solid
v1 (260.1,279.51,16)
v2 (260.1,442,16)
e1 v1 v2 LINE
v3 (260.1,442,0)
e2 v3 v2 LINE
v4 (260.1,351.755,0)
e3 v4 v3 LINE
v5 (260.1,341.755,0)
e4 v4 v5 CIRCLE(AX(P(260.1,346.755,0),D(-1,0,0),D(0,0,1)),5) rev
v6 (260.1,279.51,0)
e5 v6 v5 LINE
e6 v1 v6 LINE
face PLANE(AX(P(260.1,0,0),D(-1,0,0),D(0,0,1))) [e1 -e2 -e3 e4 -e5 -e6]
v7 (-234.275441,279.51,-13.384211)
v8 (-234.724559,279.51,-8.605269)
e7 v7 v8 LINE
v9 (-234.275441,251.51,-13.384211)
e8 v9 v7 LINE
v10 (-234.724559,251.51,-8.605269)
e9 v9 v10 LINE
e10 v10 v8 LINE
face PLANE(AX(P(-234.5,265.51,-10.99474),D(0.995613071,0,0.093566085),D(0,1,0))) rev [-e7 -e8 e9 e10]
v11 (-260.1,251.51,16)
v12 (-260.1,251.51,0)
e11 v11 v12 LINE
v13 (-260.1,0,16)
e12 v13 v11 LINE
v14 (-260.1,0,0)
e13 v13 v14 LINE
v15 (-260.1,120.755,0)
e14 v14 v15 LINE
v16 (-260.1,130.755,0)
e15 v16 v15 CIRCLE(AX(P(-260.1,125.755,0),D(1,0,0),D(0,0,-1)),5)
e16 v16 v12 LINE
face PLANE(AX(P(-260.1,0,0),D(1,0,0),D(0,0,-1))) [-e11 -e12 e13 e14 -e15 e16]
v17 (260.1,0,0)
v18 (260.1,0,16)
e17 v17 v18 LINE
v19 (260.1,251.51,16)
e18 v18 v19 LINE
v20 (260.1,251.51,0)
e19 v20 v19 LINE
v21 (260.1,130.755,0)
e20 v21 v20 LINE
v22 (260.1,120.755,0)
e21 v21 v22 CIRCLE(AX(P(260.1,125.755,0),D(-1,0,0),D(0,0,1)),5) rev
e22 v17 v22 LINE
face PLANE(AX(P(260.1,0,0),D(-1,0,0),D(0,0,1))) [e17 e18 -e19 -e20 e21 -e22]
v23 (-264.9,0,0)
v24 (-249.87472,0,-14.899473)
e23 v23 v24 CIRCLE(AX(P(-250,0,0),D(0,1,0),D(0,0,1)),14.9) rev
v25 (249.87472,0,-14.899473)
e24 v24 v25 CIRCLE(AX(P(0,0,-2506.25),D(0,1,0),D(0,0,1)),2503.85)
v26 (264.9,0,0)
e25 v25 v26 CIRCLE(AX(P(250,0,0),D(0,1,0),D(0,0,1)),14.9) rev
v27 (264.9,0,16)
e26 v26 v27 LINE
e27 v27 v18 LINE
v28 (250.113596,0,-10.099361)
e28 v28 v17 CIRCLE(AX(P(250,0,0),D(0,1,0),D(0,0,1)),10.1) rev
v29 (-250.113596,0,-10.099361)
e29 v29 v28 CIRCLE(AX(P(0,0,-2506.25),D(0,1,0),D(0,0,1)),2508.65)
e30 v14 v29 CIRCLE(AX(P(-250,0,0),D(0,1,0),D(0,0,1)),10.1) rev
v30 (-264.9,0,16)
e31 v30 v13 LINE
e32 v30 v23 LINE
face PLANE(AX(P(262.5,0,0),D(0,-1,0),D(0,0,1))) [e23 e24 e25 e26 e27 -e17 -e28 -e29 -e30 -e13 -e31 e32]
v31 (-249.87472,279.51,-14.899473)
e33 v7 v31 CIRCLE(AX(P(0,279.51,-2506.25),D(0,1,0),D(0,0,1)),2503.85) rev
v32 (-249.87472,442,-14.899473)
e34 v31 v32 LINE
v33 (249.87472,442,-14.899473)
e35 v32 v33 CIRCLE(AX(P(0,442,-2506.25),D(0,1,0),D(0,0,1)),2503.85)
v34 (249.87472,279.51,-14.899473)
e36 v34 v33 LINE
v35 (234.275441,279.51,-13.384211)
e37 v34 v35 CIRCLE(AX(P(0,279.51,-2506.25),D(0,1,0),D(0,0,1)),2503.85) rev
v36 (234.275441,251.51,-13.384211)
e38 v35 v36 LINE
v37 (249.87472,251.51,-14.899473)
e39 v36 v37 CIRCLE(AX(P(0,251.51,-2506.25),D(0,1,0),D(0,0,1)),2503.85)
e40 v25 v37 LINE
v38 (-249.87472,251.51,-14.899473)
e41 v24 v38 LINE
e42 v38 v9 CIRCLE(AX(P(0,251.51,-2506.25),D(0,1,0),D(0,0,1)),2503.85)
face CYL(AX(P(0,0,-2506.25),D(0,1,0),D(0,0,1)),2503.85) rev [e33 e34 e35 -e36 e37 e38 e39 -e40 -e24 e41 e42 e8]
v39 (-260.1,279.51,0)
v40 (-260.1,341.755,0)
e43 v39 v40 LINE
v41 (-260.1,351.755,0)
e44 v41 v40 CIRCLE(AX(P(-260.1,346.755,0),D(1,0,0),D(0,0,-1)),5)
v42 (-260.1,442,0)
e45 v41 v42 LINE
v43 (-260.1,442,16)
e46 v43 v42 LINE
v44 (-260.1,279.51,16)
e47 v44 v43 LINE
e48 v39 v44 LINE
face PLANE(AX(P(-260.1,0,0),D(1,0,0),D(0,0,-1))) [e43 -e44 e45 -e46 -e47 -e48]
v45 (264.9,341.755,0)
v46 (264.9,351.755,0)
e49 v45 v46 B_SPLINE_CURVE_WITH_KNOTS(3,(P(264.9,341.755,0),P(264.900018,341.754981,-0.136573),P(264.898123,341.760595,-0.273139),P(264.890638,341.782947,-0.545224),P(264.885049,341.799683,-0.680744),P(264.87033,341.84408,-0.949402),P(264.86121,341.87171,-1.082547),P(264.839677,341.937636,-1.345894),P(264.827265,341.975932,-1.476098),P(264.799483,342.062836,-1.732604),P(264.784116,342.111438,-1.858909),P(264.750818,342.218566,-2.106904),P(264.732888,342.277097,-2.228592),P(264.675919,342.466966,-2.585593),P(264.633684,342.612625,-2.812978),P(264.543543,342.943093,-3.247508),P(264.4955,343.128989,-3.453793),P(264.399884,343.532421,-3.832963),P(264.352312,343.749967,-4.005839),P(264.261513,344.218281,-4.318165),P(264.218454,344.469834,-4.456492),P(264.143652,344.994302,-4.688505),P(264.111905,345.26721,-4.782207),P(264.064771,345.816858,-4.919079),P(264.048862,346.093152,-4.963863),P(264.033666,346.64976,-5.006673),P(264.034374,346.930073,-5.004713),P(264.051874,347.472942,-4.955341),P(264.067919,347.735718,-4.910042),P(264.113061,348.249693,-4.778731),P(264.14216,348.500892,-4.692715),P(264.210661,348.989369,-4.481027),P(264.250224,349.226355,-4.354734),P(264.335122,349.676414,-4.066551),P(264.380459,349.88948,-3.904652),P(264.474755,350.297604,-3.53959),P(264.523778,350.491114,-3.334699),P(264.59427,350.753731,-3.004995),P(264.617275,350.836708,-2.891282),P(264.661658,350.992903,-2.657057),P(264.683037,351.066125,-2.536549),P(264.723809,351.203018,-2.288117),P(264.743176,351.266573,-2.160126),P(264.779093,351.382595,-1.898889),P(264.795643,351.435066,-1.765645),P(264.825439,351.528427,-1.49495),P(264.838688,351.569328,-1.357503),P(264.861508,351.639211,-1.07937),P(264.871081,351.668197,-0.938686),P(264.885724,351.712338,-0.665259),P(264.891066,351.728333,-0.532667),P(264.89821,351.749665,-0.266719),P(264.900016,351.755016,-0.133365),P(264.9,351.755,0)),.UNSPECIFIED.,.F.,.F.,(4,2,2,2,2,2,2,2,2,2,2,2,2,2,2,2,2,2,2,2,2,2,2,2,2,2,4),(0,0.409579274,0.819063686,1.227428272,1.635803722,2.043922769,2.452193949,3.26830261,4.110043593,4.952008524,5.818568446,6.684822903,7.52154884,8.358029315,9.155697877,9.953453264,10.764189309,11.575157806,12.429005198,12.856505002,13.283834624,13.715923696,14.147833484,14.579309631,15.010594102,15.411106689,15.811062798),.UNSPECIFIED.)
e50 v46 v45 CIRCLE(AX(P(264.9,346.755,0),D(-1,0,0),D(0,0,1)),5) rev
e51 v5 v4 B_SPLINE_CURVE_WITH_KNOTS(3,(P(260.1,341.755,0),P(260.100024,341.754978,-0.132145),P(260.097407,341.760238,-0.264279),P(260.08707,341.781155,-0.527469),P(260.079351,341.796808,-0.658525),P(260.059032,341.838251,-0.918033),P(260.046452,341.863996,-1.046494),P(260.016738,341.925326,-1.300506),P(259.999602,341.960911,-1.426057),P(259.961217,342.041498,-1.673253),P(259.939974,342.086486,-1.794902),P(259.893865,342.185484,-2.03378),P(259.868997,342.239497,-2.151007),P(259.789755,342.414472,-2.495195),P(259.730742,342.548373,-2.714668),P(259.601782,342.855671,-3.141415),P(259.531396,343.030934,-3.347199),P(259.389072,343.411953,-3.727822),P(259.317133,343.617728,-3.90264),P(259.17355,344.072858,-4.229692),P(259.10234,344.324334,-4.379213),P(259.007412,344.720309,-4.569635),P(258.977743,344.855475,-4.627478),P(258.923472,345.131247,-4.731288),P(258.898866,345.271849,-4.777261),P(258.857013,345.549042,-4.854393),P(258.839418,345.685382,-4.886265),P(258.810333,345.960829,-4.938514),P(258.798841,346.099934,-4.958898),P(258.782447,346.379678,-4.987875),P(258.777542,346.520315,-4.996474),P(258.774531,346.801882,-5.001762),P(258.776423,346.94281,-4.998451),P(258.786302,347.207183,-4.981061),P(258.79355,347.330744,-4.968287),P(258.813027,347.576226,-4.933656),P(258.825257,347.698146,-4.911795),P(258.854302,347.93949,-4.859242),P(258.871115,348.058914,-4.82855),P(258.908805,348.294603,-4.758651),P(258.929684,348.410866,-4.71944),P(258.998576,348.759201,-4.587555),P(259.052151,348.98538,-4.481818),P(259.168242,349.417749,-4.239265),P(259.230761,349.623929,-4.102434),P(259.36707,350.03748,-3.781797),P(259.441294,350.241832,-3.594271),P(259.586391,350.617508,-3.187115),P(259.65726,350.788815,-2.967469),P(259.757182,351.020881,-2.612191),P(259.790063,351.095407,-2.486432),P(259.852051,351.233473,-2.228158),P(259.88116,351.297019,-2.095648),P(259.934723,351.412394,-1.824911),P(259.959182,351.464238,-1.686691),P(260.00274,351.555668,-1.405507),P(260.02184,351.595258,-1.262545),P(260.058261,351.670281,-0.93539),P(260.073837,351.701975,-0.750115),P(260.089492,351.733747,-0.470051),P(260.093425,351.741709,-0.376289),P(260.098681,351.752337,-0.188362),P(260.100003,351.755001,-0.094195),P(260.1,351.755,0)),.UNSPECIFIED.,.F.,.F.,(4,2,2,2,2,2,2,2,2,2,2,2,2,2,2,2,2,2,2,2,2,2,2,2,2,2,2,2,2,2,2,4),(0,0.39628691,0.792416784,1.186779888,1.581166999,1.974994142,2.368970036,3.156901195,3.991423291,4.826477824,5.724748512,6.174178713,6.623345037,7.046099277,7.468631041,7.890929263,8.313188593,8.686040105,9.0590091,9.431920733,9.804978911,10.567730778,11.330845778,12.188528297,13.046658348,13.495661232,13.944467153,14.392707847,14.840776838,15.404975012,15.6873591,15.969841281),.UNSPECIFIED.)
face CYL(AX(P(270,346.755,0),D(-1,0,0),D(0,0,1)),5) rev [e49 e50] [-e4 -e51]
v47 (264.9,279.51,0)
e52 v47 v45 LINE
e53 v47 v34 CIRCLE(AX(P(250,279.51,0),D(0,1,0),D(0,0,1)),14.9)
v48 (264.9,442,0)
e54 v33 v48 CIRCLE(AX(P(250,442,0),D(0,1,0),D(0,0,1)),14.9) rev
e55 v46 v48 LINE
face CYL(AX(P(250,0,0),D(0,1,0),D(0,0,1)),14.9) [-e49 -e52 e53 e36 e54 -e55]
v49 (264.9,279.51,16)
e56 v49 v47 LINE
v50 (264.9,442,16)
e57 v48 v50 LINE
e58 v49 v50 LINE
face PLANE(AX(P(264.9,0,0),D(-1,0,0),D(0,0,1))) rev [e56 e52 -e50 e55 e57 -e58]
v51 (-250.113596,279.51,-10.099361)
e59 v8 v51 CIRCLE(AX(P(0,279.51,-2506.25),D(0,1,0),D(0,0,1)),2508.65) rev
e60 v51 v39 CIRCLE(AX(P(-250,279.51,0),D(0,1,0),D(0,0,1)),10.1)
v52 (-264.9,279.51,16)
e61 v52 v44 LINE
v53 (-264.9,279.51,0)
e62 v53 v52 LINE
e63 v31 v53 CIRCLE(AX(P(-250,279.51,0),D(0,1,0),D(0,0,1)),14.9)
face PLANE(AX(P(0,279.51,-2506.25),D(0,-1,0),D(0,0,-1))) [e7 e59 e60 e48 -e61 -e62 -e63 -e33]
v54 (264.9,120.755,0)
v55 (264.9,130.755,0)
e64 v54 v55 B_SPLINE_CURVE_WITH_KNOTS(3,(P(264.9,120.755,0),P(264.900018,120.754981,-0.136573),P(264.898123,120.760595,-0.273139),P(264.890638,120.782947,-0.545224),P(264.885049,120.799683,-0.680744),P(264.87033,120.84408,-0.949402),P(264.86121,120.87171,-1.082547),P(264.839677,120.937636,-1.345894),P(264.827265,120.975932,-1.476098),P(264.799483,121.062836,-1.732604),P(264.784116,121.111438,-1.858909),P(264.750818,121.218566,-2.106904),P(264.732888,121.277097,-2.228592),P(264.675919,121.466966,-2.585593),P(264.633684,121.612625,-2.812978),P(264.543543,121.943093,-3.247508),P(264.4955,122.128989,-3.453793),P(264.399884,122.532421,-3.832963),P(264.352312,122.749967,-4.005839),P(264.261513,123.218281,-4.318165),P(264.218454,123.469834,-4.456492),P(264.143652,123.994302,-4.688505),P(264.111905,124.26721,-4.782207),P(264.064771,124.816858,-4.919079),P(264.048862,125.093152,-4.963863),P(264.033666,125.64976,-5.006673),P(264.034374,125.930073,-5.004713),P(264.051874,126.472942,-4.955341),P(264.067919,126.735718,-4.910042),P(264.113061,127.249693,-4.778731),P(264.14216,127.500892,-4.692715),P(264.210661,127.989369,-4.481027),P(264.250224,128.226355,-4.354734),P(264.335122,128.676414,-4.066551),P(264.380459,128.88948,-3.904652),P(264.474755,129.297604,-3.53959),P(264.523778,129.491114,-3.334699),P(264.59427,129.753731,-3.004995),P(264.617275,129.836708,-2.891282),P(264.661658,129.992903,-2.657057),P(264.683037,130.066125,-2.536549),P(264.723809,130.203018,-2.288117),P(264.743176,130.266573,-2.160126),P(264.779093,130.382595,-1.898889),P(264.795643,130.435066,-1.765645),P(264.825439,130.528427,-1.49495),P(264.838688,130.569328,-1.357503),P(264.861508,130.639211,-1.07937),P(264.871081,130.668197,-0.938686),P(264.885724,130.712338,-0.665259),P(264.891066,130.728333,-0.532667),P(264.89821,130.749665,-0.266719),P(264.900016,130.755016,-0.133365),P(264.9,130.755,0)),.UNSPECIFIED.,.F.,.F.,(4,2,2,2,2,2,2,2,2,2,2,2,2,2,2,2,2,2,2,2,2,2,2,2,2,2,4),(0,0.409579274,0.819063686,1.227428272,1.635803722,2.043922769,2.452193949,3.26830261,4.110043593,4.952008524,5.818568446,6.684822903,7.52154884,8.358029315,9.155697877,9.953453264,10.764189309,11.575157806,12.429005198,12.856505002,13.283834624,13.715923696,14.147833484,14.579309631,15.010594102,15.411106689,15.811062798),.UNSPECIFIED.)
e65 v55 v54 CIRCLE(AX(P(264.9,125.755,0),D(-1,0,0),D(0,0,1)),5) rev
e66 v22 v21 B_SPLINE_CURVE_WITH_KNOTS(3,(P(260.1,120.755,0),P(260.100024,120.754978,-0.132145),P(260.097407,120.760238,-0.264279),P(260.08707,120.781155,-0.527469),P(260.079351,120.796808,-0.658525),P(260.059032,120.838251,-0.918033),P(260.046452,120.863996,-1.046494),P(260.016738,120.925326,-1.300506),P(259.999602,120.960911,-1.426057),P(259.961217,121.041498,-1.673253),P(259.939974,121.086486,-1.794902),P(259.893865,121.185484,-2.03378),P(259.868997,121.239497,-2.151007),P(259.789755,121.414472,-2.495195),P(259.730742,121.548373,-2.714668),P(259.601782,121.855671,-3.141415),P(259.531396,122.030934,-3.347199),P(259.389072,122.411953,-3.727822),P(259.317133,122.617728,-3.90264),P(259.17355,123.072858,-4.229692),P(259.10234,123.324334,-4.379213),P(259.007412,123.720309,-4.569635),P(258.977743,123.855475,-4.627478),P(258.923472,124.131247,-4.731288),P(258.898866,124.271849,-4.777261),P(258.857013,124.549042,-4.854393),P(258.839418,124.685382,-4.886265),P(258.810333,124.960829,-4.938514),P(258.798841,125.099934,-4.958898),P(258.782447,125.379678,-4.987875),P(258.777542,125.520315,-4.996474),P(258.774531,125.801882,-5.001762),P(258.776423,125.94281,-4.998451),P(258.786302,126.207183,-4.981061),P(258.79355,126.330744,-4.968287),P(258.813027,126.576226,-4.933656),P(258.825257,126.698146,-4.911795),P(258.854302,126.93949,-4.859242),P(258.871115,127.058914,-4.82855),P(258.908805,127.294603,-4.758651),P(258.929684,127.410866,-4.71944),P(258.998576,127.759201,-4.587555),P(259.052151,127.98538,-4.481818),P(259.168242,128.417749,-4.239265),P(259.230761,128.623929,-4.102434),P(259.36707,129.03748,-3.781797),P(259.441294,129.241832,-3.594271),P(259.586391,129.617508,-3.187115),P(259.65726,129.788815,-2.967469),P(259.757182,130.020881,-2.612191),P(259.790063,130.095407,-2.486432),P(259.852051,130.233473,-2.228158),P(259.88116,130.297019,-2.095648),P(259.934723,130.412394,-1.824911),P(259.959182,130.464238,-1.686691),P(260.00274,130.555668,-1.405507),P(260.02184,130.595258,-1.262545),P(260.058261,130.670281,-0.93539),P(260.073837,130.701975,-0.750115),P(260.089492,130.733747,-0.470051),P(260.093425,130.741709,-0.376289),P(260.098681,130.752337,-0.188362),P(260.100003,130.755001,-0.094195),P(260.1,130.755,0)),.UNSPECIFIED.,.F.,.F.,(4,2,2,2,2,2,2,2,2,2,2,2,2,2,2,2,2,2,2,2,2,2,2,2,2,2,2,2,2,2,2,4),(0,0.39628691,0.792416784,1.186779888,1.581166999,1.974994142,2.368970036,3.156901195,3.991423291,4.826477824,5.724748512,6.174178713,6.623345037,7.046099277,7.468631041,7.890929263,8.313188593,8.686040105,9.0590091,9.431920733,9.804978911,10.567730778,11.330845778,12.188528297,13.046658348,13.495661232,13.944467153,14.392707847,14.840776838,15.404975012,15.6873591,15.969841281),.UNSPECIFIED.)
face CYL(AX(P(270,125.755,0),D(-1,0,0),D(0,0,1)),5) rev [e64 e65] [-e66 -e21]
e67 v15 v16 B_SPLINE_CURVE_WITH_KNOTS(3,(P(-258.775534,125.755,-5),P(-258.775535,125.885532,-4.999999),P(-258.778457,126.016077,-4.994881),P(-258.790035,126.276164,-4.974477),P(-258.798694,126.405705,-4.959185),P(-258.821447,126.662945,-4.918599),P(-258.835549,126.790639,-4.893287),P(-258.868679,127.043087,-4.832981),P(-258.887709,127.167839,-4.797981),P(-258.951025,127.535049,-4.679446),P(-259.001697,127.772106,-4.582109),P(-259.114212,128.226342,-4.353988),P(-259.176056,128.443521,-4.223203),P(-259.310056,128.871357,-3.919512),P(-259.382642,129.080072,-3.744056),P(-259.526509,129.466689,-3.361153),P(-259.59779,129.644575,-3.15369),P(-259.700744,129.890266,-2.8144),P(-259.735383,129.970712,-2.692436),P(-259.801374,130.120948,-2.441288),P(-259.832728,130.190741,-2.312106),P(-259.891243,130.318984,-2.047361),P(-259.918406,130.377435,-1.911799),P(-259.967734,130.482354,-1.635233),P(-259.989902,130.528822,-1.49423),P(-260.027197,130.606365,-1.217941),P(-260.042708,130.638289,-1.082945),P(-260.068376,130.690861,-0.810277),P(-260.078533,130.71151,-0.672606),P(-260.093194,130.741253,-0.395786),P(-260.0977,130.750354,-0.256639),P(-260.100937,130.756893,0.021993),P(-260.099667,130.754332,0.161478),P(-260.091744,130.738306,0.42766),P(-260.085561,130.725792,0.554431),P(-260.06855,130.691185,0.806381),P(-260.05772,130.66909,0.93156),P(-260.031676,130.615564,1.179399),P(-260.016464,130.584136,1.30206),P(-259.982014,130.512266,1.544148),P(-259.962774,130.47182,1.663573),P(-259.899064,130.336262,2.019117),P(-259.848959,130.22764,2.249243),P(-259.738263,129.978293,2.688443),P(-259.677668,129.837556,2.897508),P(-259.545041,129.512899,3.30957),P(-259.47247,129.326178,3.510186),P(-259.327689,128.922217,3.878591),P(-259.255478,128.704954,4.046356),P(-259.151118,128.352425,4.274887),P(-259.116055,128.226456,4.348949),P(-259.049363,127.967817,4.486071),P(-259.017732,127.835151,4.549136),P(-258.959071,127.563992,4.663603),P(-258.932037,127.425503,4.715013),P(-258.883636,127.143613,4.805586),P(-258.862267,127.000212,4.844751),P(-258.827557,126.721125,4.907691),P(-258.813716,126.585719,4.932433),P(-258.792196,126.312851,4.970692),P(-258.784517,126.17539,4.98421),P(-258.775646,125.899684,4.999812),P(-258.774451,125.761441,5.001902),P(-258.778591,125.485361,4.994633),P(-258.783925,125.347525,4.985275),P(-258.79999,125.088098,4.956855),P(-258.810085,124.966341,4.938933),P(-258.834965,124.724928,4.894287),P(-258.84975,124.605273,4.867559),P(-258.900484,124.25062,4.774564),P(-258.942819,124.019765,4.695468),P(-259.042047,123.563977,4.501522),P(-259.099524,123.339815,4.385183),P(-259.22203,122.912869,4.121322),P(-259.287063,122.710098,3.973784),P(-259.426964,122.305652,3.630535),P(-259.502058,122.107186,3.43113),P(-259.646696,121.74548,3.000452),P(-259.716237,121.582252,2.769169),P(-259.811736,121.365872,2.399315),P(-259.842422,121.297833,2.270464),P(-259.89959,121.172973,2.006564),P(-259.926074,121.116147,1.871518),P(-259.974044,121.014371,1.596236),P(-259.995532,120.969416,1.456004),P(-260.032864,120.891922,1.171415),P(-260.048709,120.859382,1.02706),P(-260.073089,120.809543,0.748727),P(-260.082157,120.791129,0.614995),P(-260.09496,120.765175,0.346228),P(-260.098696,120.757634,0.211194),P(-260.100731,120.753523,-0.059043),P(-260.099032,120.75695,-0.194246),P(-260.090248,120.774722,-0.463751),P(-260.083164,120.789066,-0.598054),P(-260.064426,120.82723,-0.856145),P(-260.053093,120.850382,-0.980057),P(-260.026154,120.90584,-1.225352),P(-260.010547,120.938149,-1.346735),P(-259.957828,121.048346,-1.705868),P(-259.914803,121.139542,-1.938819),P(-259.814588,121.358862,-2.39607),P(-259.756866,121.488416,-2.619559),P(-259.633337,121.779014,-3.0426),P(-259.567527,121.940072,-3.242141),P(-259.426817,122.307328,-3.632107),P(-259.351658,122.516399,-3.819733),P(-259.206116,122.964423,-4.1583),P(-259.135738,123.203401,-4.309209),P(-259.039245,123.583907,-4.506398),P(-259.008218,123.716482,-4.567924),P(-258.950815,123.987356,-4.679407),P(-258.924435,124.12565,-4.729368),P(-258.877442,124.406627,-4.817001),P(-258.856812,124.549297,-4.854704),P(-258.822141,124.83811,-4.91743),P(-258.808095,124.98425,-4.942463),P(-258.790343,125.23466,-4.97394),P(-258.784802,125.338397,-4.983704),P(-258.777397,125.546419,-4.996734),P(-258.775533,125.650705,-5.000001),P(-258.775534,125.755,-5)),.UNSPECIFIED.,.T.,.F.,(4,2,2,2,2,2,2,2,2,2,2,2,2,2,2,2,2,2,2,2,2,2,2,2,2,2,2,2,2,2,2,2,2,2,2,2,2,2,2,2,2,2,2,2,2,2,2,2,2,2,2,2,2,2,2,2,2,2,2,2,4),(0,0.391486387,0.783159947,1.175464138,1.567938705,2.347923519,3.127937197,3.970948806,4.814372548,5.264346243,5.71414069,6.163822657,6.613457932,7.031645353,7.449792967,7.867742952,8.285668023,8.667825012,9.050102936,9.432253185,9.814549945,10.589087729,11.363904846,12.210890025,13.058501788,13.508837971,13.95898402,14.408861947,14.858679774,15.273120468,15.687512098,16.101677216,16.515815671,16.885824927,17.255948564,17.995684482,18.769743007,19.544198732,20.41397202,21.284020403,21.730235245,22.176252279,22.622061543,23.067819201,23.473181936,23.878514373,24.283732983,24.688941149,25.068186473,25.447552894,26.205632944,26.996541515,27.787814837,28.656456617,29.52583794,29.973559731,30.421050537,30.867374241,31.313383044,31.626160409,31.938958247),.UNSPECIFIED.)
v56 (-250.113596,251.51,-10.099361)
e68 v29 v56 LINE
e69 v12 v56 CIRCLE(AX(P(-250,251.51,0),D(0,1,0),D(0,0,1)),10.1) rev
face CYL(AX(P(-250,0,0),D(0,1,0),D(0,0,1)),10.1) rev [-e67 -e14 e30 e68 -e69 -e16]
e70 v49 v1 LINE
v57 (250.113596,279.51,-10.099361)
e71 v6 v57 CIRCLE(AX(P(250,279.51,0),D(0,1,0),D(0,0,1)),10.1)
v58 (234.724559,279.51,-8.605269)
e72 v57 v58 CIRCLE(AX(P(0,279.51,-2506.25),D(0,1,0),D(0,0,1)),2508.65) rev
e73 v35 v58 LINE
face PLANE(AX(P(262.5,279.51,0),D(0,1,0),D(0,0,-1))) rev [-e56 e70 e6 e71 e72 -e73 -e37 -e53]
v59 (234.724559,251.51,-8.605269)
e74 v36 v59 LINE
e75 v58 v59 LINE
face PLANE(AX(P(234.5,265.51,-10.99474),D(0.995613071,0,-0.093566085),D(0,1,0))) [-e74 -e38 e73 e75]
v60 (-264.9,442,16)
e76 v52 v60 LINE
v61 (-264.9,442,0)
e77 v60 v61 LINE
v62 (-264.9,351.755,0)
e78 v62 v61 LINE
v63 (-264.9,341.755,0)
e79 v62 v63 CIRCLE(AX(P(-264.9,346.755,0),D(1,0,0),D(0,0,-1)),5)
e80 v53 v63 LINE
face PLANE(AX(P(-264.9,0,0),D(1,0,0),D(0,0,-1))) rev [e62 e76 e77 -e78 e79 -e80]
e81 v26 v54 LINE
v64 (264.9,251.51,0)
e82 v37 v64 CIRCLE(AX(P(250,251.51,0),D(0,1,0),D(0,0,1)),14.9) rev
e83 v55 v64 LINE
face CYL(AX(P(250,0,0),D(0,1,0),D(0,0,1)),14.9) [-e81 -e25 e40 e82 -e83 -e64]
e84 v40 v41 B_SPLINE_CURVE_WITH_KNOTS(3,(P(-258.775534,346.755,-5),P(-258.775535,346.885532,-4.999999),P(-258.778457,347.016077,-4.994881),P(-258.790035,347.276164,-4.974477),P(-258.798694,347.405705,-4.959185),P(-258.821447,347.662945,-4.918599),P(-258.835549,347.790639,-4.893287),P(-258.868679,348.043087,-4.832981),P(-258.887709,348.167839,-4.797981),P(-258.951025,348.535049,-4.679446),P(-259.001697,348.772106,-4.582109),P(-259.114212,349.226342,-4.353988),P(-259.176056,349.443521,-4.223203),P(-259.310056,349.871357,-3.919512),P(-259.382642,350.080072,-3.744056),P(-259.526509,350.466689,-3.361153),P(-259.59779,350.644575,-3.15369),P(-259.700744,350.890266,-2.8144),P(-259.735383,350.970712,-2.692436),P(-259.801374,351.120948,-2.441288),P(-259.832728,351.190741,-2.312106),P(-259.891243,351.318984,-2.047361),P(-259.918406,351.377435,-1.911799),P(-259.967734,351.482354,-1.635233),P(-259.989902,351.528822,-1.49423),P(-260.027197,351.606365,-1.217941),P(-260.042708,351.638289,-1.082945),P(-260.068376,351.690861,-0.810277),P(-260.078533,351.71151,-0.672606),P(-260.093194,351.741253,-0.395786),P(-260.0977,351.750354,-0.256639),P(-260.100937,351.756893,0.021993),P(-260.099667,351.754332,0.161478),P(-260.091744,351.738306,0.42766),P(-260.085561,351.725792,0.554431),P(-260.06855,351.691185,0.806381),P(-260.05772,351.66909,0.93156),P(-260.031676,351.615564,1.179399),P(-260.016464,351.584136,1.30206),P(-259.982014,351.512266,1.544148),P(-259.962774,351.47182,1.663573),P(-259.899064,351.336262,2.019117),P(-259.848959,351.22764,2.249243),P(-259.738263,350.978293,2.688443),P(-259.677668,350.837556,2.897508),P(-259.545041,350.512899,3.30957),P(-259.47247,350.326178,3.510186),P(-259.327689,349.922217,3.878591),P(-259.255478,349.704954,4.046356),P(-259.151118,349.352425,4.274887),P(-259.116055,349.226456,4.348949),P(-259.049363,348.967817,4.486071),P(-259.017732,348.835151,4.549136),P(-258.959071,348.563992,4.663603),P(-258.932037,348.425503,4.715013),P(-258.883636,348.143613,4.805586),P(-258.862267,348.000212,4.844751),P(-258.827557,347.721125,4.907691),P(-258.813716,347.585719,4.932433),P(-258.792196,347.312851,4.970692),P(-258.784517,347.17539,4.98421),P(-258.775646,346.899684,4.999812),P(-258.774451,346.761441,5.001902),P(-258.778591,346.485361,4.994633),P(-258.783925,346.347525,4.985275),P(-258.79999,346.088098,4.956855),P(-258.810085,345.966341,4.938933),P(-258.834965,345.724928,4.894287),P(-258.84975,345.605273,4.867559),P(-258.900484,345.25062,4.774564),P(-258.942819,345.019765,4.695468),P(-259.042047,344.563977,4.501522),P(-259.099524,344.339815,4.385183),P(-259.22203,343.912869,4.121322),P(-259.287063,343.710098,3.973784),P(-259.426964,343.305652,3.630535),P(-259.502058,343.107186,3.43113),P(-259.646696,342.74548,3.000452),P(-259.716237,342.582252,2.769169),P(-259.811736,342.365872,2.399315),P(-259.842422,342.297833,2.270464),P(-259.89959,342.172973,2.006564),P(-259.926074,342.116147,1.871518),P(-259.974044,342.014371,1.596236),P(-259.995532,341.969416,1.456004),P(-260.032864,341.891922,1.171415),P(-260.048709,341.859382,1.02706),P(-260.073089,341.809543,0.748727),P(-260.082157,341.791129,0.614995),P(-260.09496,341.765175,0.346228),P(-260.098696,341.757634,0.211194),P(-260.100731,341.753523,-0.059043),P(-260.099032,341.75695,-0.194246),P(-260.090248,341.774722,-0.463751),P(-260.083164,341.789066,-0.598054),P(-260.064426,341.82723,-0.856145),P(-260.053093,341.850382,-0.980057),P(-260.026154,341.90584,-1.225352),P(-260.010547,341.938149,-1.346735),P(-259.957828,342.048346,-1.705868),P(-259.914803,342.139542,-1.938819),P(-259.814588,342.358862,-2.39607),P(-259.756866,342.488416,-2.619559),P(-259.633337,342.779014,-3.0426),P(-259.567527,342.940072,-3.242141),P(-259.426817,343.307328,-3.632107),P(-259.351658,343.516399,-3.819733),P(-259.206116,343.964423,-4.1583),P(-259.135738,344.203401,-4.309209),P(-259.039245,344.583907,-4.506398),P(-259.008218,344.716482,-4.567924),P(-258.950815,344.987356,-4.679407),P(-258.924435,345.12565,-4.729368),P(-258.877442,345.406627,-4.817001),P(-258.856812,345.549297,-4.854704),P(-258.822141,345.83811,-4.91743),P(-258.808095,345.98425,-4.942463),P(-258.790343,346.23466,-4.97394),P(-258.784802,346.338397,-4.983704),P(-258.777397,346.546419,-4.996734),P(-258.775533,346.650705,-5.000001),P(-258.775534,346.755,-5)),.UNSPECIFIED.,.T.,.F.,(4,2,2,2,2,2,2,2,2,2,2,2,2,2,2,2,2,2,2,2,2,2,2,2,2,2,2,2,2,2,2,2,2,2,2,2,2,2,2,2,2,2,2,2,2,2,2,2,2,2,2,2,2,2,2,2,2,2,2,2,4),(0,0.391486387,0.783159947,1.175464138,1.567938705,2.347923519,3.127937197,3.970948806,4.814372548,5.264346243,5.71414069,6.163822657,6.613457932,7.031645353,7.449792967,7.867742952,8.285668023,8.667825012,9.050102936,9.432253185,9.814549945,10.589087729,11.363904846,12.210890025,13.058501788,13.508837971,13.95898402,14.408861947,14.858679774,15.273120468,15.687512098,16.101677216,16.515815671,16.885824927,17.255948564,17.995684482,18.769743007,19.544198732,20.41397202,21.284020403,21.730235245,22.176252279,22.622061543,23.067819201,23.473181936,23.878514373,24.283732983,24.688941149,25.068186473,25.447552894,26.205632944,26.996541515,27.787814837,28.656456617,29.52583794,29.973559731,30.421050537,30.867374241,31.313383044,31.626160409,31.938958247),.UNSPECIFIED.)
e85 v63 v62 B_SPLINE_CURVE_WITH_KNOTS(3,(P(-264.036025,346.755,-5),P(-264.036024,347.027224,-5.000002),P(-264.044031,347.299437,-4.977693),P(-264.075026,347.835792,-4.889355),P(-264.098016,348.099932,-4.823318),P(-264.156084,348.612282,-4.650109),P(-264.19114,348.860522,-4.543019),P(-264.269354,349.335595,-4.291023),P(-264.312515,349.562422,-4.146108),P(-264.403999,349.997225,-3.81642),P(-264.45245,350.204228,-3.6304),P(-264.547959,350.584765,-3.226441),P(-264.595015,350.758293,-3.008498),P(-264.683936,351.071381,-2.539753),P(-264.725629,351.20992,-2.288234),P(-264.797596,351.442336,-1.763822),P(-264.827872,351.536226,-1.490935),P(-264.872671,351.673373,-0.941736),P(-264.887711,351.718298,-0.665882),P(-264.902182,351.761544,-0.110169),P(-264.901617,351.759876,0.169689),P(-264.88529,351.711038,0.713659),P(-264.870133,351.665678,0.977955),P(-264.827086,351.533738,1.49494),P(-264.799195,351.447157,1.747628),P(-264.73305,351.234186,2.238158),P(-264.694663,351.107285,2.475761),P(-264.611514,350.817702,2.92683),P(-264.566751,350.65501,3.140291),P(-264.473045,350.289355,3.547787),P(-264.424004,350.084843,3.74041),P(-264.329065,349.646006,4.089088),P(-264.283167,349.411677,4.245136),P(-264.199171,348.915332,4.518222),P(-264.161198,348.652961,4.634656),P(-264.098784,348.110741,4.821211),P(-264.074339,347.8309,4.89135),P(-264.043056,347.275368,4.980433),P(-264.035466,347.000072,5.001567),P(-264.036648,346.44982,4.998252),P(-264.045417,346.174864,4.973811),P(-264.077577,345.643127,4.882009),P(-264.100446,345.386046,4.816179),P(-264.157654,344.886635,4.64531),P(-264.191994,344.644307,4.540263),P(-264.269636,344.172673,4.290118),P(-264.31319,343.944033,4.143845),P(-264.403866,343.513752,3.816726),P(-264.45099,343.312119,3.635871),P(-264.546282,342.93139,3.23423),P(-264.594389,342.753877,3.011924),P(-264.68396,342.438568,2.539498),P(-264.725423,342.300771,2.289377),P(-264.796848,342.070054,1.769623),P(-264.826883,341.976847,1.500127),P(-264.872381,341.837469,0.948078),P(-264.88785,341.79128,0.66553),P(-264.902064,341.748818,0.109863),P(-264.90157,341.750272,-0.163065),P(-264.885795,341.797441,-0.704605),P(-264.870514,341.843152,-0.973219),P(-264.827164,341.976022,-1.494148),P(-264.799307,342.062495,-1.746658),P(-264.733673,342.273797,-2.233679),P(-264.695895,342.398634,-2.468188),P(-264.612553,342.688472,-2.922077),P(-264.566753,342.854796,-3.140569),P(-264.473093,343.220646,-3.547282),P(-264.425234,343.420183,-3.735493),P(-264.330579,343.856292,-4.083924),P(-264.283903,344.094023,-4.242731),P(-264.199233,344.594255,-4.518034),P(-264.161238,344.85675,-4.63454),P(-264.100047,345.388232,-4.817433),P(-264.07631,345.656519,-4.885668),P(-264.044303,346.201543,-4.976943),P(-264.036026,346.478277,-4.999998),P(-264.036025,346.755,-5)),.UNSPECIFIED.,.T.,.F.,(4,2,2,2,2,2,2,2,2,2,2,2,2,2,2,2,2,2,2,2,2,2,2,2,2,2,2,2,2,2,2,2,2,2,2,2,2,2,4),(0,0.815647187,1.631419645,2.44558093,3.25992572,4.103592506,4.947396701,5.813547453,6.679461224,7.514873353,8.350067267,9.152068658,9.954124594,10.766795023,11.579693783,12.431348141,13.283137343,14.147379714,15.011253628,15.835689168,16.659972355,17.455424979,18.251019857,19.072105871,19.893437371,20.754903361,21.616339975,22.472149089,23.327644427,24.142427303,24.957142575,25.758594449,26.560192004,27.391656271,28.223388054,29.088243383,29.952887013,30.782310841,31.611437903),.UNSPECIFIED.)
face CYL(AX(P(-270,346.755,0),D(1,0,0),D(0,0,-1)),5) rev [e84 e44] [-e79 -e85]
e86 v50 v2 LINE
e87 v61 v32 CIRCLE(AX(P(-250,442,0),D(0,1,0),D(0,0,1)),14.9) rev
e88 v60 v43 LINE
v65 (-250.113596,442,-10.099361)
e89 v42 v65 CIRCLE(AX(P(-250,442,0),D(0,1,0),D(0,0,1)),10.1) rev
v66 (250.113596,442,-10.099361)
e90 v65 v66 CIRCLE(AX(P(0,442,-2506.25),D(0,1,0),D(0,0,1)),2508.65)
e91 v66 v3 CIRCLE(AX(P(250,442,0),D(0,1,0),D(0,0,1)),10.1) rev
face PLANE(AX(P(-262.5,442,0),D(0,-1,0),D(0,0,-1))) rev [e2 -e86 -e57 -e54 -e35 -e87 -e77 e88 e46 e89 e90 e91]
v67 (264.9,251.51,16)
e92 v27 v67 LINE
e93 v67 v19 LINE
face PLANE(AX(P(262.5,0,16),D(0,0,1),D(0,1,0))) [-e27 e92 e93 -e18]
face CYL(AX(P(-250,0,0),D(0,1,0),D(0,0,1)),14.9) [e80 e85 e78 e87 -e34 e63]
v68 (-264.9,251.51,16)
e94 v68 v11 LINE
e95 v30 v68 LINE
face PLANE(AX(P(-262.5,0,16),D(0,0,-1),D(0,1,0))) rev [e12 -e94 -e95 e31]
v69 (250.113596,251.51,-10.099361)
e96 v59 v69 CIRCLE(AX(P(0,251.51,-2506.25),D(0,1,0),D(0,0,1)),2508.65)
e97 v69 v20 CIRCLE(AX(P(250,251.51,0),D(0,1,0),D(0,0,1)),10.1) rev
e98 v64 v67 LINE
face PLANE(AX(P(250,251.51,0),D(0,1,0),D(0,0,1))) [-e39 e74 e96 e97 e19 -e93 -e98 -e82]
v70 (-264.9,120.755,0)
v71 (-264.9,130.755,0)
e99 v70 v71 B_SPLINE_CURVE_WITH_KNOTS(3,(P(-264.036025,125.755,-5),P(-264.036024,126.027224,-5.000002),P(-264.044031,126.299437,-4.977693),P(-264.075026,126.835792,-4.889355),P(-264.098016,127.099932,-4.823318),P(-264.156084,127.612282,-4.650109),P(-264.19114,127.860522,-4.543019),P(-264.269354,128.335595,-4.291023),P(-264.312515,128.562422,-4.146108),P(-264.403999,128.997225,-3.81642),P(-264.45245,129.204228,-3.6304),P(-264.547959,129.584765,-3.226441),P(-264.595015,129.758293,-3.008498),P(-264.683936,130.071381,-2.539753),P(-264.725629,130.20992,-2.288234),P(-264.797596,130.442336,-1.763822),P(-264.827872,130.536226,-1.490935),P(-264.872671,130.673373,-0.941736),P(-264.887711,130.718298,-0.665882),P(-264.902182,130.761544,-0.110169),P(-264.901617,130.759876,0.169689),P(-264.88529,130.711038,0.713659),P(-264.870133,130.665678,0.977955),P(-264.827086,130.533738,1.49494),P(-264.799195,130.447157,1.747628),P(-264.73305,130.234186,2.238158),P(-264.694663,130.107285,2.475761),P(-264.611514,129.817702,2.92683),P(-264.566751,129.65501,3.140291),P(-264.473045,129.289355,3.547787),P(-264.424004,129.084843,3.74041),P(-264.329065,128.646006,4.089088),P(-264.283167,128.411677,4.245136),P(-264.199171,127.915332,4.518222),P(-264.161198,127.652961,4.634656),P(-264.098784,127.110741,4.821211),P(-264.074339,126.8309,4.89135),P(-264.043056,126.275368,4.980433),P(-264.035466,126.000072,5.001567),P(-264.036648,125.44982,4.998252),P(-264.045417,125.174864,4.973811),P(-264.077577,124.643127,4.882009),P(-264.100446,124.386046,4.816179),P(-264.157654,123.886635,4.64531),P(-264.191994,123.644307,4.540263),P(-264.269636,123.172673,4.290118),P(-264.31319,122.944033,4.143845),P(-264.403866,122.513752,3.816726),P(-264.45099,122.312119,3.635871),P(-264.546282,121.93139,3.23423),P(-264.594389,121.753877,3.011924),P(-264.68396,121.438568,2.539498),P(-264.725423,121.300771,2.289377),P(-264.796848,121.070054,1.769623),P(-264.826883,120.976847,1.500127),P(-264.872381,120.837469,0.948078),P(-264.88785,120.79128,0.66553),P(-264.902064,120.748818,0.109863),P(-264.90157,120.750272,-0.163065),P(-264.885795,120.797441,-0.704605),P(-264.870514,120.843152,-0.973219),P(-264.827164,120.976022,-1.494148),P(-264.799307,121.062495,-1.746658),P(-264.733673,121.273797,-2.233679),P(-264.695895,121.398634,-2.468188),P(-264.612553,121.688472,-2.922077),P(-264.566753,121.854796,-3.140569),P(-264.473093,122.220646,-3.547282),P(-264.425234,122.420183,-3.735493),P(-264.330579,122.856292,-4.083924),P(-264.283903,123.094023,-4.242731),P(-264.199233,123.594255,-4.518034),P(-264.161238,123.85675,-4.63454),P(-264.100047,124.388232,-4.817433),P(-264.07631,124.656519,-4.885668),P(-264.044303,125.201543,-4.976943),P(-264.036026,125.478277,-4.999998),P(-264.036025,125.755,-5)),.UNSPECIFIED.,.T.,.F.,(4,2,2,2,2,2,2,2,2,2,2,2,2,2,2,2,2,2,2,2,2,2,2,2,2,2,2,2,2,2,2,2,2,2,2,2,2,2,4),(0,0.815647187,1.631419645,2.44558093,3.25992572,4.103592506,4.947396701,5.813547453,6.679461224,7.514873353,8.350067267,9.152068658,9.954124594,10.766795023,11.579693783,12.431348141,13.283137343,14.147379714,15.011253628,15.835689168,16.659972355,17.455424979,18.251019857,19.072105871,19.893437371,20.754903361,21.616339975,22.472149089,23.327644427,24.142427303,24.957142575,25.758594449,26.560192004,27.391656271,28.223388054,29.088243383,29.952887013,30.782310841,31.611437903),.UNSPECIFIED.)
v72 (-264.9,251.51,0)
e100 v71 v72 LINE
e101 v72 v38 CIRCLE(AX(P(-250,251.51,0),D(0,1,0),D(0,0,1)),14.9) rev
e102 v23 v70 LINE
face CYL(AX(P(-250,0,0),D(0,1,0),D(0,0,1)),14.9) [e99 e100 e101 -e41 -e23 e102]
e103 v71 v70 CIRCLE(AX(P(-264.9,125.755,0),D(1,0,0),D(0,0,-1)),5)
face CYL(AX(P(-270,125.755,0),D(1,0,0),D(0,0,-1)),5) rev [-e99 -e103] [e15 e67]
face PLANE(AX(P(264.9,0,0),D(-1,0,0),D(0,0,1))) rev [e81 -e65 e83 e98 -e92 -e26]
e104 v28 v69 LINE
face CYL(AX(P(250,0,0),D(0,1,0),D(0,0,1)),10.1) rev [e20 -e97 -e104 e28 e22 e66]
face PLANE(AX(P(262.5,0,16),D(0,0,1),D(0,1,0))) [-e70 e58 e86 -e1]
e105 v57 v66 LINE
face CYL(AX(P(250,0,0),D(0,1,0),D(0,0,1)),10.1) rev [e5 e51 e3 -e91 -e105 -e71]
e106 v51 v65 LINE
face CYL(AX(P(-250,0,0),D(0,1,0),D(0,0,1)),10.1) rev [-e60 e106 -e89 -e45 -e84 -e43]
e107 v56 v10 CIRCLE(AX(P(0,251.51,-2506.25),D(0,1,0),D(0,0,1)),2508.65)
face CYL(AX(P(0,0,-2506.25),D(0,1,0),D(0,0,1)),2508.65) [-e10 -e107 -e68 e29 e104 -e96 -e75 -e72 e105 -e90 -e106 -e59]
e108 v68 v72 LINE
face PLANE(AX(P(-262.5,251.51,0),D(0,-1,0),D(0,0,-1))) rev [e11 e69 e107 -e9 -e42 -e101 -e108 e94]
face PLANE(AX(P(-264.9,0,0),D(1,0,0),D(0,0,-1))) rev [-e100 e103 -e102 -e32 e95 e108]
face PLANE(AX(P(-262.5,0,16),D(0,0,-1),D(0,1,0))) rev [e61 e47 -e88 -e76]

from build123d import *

# Parameters (mm, degrees)
THICKEN1_DEPTH     = 442
THICKEN1_2_DEPTH   = 251.51
THICKEN1_START     = 279.51
THICKEN1_3_DEPTH   = 162.49
SKETCH4_R          = 5
CUT_EXTRUDE1_DEPTH = 20
SKETCH5_R          = 5
CUT_EXTRUDE2_DEPTH = 20
CUT_EXTRUDE3_START = -20
SKETCH7_R          = 5
CUT_EXTRUDE3_DEPTH = 20


# Read off the part's stored shape, not the designer's step: Thicken1
with BuildPart() as part:
    # Thicken1 outline → Thicken1 (new body)
    with BuildSketch(Plane(origin=(0, 0, 0), x_dir=(1, 0, 0), z_dir=(0, 1, 0))):
        with BuildLine():
            ThreePointArc((-234.724558603, 8.605268641), (0, -2.4), (234.724558603, 8.605268641))
            Line((234.724558603, 8.605268641), (234.275441397, 13.384211383))
            ThreePointArc((234.275441397, 13.384211383), (0, 2.4), (-234.275441397, 13.384211383))
            Line((-234.275441397, 13.384211383), (-234.724558603, 8.605268641))
        make_face()
    extrude(amount=THICKEN1_DEPTH)

    # Thicken1 2 outline → Thicken1 2 (add)
    with BuildSketch(Plane(origin=(0, 0, 0), x_dir=(1, 0, 0), z_dir=(0, 1, 0))):
        with BuildLine():
            Line((234.275441397, 13.384211383), (234.724558603, 8.605268641))
            ThreePointArc((234.724558603, 8.605268641), (242.420228217, 9.340459098), (250.113595715, 10.099361169))
            ThreePointArc((250.113595715, 10.099361169), (257.181828344, 7.101502773), (260.1, 0))
            Line((260.1, 0), (260.1, -16))
            Line((260.1, -16), (264.9, -16))
            Line((264.9, -16), (264.9, 0))
            ThreePointArc((264.9, 0), (260.491504347, 10.580091518), (249.874719929, 14.89947331))
            ThreePointArc((249.874719929, 14.89947331), (242.076266252, 14.129636973), (234.275441397, 13.384211383))
        make_face()
        with BuildLine():
            ThreePointArc((-250.113595715, 10.099361169), (-242.420228217, 9.340459098), (-234.724558603, 8.605268641))
            Line((-234.724558603, 8.605268641), (-234.275441397, 13.384211383))
            ThreePointArc((-234.275441397, 13.384211383), (-242.076266252, 14.129636973), (-249.874719929, 14.89947331))
            ThreePointArc((-249.874719929, 14.89947331), (-260.491504347, 10.580091518), (-264.9, 0))
            Line((-264.9, 0), (-264.9, -16))
            Line((-264.9, -16), (-260.1, -16))
            Line((-260.1, -16), (-260.1, 0))
            ThreePointArc((-260.1, 0), (-257.181828344, 7.101502773), (-250.113595715, 10.099361169))
        make_face()
    extrude(amount=THICKEN1_2_DEPTH)

    # Thicken1 3 outline → Thicken1 3 (add)
    with BuildSketch(Plane(origin=(0, 0, 0), x_dir=(1, 0, 0), z_dir=(0, 1, 0)).offset(THICKEN1_START)):
        with BuildLine():
            Line((234.275441397, 13.384211383), (234.724558603, 8.605268641))
            ThreePointArc((234.724558603, 8.605268641), (242.420228217, 9.340459098), (250.113595715, 10.099361169))
            ThreePointArc((250.113595715, 10.099361169), (257.181828344, 7.101502773), (260.1, 0))
            Line((260.1, 0), (260.1, -16))
            Line((260.1, -16), (264.9, -16))
            Line((264.9, -16), (264.9, 0))
            ThreePointArc((264.9, 0), (260.491504347, 10.580091518), (249.874719929, 14.89947331))
            ThreePointArc((249.874719929, 14.89947331), (242.076266252, 14.129636973), (234.275441397, 13.384211383))
        make_face()
        with BuildLine():
            ThreePointArc((-250.113595715, 10.099361169), (-242.420228217, 9.340459098), (-234.724558603, 8.605268641))
            Line((-234.724558603, 8.605268641), (-234.275441397, 13.384211383))
            ThreePointArc((-234.275441397, 13.384211383), (-242.076266252, 14.129636973), (-249.874719929, 14.89947331))
            ThreePointArc((-249.874719929, 14.89947331), (-260.491504347, 10.580091518), (-264.9, 0))
            Line((-264.9, 0), (-264.9, -16))
            Line((-264.9, -16), (-260.1, -16))
            Line((-260.1, -16), (-260.1, 0))
            ThreePointArc((-260.1, 0), (-257.181828344, 7.101502773), (-250.113595715, 10.099361169))
        make_face()
    extrude(amount=THICKEN1_3_DEPTH)

    # Sketch4 → Cut-Extrude1 (cut)
    with BuildSketch(Plane(origin=(250, 0, 0), x_dir=(0, 0, -1), z_dir=(1, 0, 0))):
        with Locations(Location((0, 346.755, 0), (0, 0, 90))):
            Circle(SKETCH4_R)
    extrude(amount=CUT_EXTRUDE1_DEPTH, mode=Mode.SUBTRACT)

    # Sketch5 → Cut-Extrude2 (cut)
    with BuildSketch(Plane(origin=(250, 0, 0), x_dir=(0, 0, -1), z_dir=(1, 0, 0))):
        with Locations(Location((0, 125.755, 0), (0, 0, 270))):
            Circle(SKETCH5_R)
    extrude(amount=CUT_EXTRUDE2_DEPTH, mode=Mode.SUBTRACT)

    # Sketch7 → Cut-Extrude3 (cut)
    with BuildSketch(Plane(origin=(-250, 0, 0), x_dir=(0, 0, -1), z_dir=(1, 0, 0)).offset(CUT_EXTRUDE3_START)):
        with Locations(Location((0, 346.755, 0), (0, 0, 90))):
            Circle(SKETCH7_R)
        with Locations(Location((0, 125.755, 0), (0, 0, 270))):
            Circle(SKETCH7_R)
    extrude(amount=CUT_EXTRUDE3_DEPTH, mode=Mode.SUBTRACT)


solid = part.part
